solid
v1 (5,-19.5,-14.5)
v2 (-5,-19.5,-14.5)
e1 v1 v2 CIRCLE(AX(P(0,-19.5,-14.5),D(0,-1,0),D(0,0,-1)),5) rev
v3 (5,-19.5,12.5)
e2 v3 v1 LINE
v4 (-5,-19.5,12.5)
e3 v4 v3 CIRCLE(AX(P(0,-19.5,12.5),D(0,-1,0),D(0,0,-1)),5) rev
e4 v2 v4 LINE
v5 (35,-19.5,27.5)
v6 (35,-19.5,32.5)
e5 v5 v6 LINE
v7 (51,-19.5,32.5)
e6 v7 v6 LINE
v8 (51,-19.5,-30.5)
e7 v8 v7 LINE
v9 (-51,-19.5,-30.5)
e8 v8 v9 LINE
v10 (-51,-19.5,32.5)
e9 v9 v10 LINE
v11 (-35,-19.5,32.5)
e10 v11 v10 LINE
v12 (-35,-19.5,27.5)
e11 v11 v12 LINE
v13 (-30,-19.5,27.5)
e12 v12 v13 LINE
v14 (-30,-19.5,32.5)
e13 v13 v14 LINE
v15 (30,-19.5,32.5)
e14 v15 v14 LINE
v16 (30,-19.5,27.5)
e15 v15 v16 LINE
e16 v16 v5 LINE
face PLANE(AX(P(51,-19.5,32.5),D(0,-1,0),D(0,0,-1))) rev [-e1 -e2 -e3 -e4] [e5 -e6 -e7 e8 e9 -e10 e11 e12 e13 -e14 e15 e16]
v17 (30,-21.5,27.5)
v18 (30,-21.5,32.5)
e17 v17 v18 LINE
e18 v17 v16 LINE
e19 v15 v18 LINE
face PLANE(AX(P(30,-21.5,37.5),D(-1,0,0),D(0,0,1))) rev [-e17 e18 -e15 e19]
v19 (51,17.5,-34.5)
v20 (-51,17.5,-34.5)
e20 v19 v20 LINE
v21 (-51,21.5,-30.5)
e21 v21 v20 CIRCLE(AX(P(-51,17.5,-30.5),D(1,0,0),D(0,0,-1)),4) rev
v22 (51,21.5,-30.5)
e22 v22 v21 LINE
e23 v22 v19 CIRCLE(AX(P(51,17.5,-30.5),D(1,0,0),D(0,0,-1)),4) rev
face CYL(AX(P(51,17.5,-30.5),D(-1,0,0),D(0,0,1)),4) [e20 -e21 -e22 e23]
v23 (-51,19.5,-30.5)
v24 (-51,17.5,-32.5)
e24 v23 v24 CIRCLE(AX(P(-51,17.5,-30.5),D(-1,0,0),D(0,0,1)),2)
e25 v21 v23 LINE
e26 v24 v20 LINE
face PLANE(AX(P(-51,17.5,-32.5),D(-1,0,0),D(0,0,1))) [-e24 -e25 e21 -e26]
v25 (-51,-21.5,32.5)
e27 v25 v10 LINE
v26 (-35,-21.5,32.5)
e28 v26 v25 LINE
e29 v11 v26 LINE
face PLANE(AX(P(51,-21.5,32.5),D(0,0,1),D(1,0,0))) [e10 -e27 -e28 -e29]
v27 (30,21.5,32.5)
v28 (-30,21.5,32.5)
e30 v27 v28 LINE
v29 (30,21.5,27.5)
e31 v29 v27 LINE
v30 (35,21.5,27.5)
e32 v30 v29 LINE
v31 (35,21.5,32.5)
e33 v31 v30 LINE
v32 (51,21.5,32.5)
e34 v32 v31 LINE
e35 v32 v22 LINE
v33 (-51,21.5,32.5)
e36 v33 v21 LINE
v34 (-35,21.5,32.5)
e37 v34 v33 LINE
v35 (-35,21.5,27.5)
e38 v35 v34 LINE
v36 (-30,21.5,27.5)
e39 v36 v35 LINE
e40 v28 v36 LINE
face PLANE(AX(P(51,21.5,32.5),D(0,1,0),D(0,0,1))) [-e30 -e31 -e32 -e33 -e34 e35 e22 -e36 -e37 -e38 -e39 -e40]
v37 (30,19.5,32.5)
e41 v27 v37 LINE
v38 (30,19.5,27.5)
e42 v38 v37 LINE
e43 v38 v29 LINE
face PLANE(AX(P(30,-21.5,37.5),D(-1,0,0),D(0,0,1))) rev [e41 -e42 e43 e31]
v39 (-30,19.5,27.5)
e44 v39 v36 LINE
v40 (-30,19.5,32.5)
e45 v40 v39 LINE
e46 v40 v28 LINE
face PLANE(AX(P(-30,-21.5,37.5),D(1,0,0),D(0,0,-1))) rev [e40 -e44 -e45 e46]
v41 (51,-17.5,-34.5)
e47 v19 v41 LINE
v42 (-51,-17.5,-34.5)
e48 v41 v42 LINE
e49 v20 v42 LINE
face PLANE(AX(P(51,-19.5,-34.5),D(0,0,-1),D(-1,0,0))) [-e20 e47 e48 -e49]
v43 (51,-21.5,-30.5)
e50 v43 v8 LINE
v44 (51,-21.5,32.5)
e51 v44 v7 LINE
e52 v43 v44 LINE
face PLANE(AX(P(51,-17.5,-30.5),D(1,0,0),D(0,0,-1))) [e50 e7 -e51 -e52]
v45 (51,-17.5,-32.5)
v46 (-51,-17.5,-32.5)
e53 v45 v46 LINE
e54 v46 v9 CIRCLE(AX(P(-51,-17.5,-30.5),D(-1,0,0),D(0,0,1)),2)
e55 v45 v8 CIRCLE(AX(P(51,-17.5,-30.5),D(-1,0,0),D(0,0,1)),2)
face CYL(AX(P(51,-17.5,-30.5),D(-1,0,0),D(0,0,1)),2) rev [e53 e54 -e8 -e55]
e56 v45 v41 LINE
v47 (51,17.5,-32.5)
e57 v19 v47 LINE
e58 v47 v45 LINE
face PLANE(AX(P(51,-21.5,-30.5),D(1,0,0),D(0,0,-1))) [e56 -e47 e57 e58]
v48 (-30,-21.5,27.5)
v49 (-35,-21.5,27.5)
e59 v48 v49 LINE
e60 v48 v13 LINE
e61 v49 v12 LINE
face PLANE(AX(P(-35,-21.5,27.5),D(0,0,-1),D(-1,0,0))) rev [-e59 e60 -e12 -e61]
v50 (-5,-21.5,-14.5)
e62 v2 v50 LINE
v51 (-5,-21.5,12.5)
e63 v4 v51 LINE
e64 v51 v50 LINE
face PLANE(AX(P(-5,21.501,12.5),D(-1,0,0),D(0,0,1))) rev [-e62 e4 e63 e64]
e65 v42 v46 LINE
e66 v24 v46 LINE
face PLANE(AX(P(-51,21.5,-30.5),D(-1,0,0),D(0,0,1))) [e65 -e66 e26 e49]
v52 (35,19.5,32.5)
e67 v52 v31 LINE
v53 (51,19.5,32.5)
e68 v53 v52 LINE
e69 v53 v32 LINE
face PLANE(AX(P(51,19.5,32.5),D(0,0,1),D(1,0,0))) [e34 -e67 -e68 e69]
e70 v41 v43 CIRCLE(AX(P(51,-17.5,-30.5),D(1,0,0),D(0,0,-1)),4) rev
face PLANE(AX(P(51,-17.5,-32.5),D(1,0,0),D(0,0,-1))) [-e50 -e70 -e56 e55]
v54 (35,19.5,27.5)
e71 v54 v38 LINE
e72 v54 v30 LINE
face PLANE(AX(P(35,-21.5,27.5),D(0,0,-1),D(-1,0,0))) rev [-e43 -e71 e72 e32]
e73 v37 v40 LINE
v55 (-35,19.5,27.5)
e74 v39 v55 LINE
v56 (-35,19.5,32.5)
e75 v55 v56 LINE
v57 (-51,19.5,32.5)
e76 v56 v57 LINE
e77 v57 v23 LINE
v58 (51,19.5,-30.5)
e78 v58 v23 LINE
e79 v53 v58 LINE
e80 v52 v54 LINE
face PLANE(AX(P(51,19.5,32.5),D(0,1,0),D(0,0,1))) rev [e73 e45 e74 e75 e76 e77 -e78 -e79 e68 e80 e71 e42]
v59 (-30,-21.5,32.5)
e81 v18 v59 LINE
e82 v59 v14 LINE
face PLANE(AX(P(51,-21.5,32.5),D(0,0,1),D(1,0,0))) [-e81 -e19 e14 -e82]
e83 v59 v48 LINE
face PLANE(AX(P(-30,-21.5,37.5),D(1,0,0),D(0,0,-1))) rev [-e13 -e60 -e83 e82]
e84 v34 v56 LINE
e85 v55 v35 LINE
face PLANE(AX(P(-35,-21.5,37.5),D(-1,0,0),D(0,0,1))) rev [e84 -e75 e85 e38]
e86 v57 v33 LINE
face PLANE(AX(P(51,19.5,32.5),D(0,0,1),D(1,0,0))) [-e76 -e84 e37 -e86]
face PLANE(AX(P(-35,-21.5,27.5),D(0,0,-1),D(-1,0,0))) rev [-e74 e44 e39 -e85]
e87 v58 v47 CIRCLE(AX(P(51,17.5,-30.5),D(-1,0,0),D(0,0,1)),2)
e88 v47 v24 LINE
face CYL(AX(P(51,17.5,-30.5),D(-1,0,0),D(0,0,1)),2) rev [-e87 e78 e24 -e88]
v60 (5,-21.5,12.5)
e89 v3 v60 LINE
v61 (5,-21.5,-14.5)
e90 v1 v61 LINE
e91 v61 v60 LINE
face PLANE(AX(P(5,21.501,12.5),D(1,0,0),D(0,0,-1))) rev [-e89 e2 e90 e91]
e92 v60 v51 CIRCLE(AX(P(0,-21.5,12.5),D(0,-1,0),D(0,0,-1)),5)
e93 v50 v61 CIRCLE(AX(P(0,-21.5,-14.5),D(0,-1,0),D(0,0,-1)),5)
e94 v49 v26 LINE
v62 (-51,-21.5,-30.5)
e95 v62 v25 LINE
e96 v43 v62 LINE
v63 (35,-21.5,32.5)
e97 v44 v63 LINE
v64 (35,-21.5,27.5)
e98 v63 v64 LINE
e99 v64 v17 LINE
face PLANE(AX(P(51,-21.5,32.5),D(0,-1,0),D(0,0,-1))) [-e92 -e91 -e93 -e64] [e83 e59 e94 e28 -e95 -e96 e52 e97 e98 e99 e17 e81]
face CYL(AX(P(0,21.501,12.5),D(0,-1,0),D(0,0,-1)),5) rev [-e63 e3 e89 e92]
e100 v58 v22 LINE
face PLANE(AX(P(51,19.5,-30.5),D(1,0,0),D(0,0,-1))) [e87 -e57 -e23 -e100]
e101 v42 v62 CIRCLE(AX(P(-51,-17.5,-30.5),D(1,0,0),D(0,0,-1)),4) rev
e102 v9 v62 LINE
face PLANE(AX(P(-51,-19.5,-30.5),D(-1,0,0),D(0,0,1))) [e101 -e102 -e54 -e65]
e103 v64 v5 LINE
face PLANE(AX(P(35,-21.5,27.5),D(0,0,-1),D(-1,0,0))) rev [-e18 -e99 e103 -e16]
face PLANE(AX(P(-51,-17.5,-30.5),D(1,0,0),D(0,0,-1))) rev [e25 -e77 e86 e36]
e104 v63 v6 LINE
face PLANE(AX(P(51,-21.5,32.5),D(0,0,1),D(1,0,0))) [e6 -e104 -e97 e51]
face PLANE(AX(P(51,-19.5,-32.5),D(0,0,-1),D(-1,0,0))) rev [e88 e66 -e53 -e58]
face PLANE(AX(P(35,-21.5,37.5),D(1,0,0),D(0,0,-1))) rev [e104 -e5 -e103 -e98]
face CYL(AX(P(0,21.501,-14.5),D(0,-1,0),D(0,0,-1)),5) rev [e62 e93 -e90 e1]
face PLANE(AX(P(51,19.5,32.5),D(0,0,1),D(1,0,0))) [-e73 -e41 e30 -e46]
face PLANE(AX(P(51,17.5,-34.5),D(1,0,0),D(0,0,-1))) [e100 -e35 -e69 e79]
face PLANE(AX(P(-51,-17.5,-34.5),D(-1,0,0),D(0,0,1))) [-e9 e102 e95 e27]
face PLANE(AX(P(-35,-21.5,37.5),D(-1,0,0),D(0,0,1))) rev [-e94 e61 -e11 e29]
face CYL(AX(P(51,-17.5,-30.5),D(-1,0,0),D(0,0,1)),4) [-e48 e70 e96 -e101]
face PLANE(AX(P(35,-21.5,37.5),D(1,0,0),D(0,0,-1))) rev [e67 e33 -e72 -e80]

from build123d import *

# Parameters (mm, degrees)
SM_BASE_FLANGE_1_DEPTH = 51
CUT_EXTRUDE_1_REACH    = 77.102
SKETCH_3_W             = 5
SKETCH_3_H             = 10
CUT_EXTRUDE_2_DEPTH    = 76.101597853


# Sheet-metal steps are written as plain solids
with BuildPart() as part:
    # Sketch 1 → 基体-法兰1 (new, symmetric)
    with BuildSketch(Plane(origin=(0, 0, 0), x_dir=(0, 0, -1), z_dir=(1, 0, 0))):
        with BuildLine():
            Line((-32.5, -19.5), (30.5, -19.5))
            ThreePointArc((30.5, -19.5), (31.914213562, -18.914213562), (32.5, -17.5))
            Line((32.5, -17.5), (32.5, 17.5))
            ThreePointArc((32.5, 17.5), (31.914213562, 18.914213562), (30.5, 19.5))
            Line((30.5, 19.5), (-32.5, 19.5))
            Line((-32.5, 19.5), (-32.5, 21.5))
            Line((-32.5, 21.5), (30.5, 21.5))
            ThreePointArc((30.5, 21.5), (33.328427125, 20.328427125), (34.5, 17.5))
            Line((34.5, 17.5), (34.5, -17.5))
            ThreePointArc((34.5, -17.5), (33.328427125, -20.328427125), (30.5, -21.5))
            Line((30.5, -21.5), (-32.5, -21.5))
            Line((-32.5, -21.5), (-32.5, -19.5))
        make_face()
    extrude(amount=SM_BASE_FLANGE_1_DEPTH, both=True)

    # Sketch 2 → 切除-拉伸1 (cut, up to next)
    with BuildSketch(Plane.XZ.offset(21.5), mode=Mode.PRIVATE) as cut_extrude_1_sk1:
        with BuildLine():
            Line((5, 12.5), (5, -14.5))
            ThreePointArc((5, -14.5), (0, -19.5), (-5, -14.5))
            Line((-5, -14.5), (-5, 12.5))
            ThreePointArc((-5, 12.5), (0, 17.5), (5, 12.5))
        make_face()
    cut_extrude_1_tool1 = extrude(cut_extrude_1_sk1.sketch, amount=-CUT_EXTRUDE_1_REACH, mode=Mode.PRIVATE) & part.part
    add(cut_extrude_1_tool1.solids().sort_by_distance((0, -21.5, -1))[0], mode=Mode.SUBTRACT)

    # 草图3 → 切除-拉伸2 (cut, through all)
    with BuildSketch(Plane(origin=(0, 21.5, 0), x_dir=(1, 0, 0), z_dir=(0, 1, 0))):
        with Locations((-32.5, -32.5)):
            Rectangle(SKETCH_3_W, SKETCH_3_H)
        with Locations((32.5, -32.5)):
            Rectangle(SKETCH_3_W, SKETCH_3_H)
    extrude(amount=-CUT_EXTRUDE_2_DEPTH, mode=Mode.SUBTRACT)


solid = part.part
